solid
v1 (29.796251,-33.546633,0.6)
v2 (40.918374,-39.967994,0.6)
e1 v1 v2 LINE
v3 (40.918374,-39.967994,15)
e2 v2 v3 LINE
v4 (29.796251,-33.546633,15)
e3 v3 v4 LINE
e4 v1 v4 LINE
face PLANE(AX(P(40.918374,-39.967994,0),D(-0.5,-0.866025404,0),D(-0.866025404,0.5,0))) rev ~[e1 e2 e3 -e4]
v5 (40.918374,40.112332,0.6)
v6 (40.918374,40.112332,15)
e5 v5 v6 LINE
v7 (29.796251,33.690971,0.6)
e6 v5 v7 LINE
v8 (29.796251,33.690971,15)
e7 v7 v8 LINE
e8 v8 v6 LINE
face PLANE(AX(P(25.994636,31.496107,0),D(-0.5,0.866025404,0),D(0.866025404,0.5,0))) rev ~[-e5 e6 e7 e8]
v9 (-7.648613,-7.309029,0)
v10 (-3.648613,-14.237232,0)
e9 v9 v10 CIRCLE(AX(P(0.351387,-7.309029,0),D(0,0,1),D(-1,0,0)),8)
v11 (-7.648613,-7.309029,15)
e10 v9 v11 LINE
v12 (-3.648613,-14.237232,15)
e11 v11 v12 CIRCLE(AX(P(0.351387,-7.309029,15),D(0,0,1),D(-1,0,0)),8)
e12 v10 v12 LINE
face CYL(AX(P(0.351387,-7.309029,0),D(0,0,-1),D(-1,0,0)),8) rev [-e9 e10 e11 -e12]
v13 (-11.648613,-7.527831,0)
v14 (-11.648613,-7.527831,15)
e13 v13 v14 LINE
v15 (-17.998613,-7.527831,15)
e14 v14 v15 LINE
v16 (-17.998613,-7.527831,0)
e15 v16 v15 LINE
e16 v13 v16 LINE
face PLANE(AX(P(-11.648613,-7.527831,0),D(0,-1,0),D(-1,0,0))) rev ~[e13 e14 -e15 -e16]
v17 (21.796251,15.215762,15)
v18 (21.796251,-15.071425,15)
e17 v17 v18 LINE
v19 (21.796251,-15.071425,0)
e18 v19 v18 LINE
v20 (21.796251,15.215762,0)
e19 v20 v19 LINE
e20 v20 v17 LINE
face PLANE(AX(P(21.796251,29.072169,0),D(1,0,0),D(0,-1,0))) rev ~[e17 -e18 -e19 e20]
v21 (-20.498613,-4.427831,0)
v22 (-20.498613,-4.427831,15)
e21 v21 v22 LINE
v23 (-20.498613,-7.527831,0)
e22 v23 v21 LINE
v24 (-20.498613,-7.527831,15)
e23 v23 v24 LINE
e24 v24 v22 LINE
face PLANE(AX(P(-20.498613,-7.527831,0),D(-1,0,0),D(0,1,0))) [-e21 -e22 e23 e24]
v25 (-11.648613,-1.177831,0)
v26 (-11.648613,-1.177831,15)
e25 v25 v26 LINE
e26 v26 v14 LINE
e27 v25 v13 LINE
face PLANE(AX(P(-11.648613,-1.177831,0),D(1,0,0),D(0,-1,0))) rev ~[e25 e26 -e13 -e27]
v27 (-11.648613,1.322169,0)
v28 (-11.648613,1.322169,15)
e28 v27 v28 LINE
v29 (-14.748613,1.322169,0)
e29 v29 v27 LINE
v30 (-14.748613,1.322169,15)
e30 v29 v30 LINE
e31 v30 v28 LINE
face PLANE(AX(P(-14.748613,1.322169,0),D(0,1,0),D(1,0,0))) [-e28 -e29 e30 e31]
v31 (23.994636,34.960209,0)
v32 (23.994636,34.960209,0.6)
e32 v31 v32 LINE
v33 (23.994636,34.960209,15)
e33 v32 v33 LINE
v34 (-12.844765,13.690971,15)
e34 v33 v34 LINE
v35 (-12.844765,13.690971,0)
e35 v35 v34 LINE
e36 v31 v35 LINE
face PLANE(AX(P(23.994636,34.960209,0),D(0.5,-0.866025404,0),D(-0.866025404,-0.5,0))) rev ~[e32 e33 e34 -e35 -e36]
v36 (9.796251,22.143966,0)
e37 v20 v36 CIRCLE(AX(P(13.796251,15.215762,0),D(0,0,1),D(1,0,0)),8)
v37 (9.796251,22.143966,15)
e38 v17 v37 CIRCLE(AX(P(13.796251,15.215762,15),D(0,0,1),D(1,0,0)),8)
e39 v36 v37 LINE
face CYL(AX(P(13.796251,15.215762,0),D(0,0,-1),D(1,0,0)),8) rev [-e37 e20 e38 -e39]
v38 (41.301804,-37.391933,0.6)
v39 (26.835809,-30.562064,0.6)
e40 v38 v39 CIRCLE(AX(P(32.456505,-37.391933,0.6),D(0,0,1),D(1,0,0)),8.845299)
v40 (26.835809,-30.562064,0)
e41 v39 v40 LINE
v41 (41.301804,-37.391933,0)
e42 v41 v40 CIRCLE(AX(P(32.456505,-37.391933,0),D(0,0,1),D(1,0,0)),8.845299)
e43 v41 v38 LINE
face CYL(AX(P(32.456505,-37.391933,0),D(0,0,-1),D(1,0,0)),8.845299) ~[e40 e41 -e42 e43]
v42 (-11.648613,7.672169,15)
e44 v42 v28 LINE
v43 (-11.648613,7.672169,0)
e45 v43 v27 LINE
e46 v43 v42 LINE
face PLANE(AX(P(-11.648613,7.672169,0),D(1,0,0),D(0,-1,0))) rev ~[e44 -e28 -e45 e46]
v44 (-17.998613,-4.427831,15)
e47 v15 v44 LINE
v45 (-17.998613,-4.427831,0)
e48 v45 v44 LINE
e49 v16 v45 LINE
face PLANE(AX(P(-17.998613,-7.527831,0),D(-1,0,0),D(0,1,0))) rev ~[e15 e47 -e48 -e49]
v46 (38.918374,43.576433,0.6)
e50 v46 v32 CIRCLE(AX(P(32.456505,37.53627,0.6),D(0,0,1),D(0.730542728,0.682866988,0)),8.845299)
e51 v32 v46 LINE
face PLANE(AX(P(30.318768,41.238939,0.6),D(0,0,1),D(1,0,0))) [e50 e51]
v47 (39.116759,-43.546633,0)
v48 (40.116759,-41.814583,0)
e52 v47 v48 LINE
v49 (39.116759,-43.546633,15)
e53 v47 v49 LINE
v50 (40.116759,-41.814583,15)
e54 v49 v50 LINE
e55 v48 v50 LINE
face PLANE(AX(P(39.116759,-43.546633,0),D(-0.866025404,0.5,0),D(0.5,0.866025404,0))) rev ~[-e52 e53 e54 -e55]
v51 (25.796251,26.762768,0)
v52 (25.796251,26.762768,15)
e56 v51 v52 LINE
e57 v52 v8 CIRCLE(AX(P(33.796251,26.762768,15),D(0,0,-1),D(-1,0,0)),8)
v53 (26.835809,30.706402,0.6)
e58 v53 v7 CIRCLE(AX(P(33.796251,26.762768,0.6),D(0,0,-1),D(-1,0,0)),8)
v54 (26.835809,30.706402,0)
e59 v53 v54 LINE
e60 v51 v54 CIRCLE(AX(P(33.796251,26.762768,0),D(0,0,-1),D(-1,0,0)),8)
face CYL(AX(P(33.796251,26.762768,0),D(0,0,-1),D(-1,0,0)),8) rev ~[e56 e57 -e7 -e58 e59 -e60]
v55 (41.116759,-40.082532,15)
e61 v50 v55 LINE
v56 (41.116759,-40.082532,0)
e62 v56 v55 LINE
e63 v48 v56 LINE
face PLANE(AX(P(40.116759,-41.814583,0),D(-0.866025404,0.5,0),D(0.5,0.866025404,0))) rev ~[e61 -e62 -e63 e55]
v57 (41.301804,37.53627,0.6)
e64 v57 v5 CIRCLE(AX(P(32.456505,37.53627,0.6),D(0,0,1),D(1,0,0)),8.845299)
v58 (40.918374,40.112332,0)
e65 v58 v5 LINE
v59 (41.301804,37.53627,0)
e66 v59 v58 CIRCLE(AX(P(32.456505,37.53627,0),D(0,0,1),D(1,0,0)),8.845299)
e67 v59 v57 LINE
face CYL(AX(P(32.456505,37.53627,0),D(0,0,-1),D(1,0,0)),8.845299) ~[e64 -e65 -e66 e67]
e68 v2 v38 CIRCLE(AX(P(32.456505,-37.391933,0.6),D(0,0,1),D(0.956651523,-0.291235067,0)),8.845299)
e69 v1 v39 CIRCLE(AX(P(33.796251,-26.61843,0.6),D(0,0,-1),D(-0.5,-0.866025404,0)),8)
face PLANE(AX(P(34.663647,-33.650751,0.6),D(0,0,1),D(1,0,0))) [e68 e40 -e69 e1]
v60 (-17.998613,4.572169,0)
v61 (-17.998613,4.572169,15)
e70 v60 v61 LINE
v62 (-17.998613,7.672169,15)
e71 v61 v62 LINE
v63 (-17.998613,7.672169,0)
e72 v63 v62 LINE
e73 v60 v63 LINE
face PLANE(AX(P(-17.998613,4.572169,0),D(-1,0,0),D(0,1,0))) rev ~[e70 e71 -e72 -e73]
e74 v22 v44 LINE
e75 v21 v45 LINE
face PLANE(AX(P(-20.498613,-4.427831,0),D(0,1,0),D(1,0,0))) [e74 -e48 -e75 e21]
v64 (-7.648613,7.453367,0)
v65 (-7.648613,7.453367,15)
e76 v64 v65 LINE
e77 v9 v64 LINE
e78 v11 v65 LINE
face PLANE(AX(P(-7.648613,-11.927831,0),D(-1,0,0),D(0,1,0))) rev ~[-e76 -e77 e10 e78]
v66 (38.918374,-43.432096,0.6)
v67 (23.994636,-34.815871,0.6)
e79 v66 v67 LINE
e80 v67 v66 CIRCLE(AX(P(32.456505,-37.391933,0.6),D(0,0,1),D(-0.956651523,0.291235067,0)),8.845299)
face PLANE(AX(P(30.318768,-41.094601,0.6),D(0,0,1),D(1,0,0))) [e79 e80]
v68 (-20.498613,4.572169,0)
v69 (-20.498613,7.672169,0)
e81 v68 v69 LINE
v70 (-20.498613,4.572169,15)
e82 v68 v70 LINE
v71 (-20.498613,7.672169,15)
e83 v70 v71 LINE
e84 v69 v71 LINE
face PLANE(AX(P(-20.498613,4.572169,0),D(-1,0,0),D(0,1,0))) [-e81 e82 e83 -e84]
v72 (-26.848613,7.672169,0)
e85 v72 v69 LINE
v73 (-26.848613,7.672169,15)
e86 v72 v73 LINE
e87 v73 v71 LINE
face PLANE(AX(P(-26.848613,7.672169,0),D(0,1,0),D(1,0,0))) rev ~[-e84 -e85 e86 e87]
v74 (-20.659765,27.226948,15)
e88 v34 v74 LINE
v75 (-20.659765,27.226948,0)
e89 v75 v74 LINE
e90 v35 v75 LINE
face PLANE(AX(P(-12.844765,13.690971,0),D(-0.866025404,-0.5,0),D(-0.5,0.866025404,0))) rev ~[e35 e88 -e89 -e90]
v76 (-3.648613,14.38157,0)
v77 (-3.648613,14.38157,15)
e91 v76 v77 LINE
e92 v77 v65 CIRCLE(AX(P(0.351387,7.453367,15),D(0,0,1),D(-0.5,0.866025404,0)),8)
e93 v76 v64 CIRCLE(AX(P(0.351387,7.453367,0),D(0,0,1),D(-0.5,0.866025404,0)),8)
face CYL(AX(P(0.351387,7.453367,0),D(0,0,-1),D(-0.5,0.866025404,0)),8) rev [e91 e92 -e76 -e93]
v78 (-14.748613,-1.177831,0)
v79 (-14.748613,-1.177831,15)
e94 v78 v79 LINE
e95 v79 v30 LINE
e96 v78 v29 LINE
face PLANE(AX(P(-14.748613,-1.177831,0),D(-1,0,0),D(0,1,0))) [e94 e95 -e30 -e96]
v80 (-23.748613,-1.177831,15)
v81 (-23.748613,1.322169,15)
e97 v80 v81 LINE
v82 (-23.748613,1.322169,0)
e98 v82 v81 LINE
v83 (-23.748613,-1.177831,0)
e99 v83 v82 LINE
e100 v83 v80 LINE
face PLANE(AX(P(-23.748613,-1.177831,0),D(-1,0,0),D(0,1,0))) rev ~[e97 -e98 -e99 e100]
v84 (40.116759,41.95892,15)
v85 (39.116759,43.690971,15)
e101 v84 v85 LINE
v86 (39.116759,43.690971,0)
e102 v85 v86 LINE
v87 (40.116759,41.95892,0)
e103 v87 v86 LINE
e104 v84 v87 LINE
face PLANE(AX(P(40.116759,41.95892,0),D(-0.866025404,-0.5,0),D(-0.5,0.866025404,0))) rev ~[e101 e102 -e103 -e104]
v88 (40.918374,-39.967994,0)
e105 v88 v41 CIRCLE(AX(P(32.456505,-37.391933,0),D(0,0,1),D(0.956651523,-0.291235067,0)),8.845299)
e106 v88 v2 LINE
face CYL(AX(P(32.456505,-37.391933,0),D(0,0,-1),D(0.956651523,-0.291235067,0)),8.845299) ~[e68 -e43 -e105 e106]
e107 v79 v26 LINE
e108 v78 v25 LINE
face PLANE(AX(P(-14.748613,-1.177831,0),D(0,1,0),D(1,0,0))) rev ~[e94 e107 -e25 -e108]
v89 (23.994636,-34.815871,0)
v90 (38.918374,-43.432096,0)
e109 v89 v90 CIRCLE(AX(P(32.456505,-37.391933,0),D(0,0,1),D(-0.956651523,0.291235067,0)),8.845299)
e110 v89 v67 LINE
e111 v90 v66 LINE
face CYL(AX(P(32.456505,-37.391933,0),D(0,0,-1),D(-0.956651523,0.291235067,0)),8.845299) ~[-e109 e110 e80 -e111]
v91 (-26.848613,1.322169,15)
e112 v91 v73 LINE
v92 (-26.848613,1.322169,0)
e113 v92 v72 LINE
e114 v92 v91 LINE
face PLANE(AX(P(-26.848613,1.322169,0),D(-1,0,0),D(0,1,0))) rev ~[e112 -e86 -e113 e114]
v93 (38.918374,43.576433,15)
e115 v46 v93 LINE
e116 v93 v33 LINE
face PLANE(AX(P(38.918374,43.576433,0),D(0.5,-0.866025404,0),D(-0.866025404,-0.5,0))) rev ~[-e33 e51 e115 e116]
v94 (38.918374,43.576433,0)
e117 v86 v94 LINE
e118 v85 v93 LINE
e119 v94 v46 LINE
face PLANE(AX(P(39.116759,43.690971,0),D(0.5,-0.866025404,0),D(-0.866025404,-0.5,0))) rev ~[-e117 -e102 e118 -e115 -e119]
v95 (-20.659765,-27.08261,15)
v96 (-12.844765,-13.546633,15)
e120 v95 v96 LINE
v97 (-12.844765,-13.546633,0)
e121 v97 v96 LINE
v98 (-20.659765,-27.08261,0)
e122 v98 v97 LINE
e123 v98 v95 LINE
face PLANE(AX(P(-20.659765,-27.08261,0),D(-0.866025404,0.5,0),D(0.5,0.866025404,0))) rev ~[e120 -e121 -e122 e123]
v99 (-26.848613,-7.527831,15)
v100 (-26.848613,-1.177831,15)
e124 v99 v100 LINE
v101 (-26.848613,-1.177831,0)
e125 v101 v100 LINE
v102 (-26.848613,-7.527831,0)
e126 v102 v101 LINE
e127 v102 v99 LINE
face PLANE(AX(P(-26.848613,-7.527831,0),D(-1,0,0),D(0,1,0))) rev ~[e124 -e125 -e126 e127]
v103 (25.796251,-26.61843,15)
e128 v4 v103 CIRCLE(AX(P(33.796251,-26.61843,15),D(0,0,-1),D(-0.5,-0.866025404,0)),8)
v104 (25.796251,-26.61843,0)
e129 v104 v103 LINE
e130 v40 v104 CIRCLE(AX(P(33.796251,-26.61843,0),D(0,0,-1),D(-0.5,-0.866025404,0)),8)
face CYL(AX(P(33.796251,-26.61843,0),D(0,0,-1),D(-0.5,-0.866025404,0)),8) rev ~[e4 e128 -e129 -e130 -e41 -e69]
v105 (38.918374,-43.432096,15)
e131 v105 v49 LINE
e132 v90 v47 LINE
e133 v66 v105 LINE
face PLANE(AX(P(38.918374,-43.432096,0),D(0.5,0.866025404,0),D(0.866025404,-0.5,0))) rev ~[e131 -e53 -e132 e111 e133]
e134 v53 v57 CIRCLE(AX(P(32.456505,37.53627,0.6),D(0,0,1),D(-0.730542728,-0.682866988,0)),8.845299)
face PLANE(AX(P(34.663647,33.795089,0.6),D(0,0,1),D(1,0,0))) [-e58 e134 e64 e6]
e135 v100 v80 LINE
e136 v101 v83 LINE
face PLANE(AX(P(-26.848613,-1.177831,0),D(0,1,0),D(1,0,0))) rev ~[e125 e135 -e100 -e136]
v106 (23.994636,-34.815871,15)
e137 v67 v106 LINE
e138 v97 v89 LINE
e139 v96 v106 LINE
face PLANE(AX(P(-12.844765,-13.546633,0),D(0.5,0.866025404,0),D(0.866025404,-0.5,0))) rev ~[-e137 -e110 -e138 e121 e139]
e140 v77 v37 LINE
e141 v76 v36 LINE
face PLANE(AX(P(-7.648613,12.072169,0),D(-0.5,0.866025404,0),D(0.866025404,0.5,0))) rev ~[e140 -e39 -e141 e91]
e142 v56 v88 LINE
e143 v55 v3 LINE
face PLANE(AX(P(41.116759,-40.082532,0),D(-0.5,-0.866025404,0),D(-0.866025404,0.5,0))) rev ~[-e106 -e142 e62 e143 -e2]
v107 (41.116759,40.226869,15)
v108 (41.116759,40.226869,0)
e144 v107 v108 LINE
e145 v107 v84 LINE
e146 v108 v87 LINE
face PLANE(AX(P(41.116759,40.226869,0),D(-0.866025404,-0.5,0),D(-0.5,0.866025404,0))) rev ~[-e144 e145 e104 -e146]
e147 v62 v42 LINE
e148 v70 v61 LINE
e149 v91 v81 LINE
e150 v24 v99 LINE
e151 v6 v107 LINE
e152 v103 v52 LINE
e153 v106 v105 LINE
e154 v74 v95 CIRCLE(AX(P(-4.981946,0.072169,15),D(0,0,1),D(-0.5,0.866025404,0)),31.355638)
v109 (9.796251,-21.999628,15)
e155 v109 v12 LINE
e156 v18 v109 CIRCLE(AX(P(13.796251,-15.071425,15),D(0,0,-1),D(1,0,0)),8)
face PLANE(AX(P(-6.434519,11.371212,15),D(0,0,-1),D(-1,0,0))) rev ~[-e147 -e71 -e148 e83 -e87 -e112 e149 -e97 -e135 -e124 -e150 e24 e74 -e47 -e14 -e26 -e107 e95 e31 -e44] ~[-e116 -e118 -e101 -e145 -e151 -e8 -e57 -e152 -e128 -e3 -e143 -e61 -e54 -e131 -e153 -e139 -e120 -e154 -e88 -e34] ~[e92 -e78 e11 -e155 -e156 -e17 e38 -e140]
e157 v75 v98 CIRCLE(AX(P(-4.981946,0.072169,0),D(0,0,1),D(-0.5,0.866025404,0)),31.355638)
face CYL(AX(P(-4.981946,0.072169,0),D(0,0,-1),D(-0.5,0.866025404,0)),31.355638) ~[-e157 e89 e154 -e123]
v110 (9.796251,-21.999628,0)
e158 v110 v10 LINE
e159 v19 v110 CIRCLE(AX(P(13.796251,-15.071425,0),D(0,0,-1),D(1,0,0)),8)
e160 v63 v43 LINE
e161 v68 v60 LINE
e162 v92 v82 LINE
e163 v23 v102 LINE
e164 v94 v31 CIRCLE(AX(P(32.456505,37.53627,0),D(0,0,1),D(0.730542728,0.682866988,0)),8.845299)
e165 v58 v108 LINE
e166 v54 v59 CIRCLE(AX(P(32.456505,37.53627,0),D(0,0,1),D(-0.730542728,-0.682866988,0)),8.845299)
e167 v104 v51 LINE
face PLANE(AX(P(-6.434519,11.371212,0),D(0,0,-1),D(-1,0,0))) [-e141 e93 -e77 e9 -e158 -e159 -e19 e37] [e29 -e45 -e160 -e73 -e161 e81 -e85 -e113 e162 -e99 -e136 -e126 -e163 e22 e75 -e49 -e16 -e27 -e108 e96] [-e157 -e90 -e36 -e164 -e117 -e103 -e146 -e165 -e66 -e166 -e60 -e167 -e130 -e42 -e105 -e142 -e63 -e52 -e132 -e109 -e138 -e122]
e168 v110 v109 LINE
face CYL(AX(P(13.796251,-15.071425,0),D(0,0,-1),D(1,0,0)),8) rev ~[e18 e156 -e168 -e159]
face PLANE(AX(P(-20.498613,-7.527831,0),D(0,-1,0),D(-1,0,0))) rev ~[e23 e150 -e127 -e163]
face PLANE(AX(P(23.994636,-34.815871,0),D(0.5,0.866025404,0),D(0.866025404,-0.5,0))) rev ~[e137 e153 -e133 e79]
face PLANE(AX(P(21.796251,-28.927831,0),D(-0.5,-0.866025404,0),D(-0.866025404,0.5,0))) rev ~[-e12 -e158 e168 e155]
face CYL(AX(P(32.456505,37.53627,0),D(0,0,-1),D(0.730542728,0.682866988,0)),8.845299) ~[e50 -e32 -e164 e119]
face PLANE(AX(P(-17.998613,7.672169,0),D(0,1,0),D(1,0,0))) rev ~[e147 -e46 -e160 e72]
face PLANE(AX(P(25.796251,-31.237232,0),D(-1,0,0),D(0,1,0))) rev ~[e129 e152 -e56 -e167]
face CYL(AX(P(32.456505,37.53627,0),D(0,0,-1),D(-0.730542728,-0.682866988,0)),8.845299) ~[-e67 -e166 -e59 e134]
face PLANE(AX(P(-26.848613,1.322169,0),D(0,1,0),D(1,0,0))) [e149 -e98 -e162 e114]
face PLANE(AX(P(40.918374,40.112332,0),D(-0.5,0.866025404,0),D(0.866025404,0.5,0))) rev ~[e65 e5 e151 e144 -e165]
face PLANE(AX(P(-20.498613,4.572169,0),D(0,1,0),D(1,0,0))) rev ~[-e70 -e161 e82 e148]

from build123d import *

# Parameters (mm, degrees)
F0_W        = 2.5
F0_H        = 3.1
F0_W_2      = 3.1
F0_H_2      = 2.5
F1_DEPTH    = 15
F2_DEPTH    = 0.6
F3_T1_DEPTH = 15


# Not quite as in the source:
# - a fillet or chamfer that OpenCascade refuses, or shapes differently, is made with other operations: its cross-section is extruded or revolved along the edge and cut away or added


with BuildPart() as f1:
    # F0 (on Top) → F1 (new body)
    with BuildSketch(Plane.XY):
        with BuildLine():
            Line((39.1167589883, 43.6909709372), (38.9183741482, 43.5764333963))
            ThreePointArc((38.9183741482, 43.5764333963), (39.563732113, 42.8018800146), (40.1167589265, 41.9589202367))
            Line((40.1167589265, 41.9589202367), (39.1167589883, 43.6909709372))
        make_face()
        with BuildLine():
            ThreePointArc((40.1167589265, -41.8145826694), (39.563732113, -42.6575424473), (38.9183741482, -43.432095829))
            Line((38.9183741482, -43.432095829), (39.1167589883, -43.5466333699))
            Line((39.1167589883, -43.5466333699), (40.1167589265, -41.8145826694))
        make_face()
        with BuildLine():
            Line((41.1167589883, 40.226869322), (40.1167589265, 41.9589202367))
            ThreePointArc((40.1167589265, 41.9589202367), (40.5702701762, 41.0585049774), (40.9183741482, 40.1123317812))
            Line((40.9183741482, 40.1123317812), (41.1167589883, 40.226869322))
        make_face()
        with BuildLine():
            Line((41.1167589883, -40.0825317547), (40.9183741482, -39.9679942139))
            ThreePointArc((40.9183741482, -39.9679942139), (40.5702701762, -40.9141674102), (40.1167589265, -41.8145826694))
            Line((40.1167589265, -41.8145826694), (41.1167589883, -40.0825317547))
        make_face()
        with BuildLine():
            Line((38.9183741482, 43.5764333963), (23.9946357527, 34.9602090164))
            ThreePointArc((23.9946357527, 34.9602090164), (24.7962509126, 33.113620668), (25.9946357527, 31.4961074012))
            Line((25.9946357527, 31.4961074012), (40.9183741482, 40.1123317812))
            ThreePointArc((40.9183741482, 40.1123317812), (40.5702701762, 41.0585049774), (40.1167589265, 41.9589202367))
            ThreePointArc((40.1167589265, 41.9589202367), (39.563732113, 42.8018800146), (38.9183741482, 43.5764333963))
        make_face()
        with BuildLine():
            ThreePointArc((25.9946357527, -31.3517698339), (24.7962509126, -32.9692831007), (23.9946357527, -34.8158714491))
            Line((23.9946357527, -34.8158714491), (38.9183741482, -43.432095829))
            ThreePointArc((38.9183741482, -43.432095829), (39.563732113, -42.6575424473), (40.1167589265, -41.8145826694))
            ThreePointArc((40.1167589265, -41.8145826694), (40.5702701762, -40.9141674102), (40.9183741482, -39.9679942139))
            Line((40.9183741482, -39.9679942139), (25.9946357527, -31.3517698339))
        make_face()
        with BuildLine():
            Line((23.9946357527, 34.9602090164), (-12.8447652387, 13.6909709372))
            Line((-12.8447652387, 13.6909709372), (-20.6597652387, 27.2269479983))
            ThreePointArc((-20.6597652387, 27.2269479983), (-36.3375843281, 0.0721687836), (-20.6597652387, -27.082610431))
            Line((-20.6597652387, -27.082610431), (-12.8447652387, -13.5466333699))
            Line((-12.8447652387, -13.5466333699), (23.9946357527, -34.8158714491))
            ThreePointArc((23.9946357527, -34.8158714491), (24.7962509126, -32.9692831007), (25.9946357527, -31.3517698339))
            Line((25.9946357527, -31.3517698339), (25.7962509126, -31.2372322931))
            Line((25.7962509126, -31.2372322931), (25.7962509126, 31.3815698604))
            Line((25.7962509126, 31.3815698604), (25.9946357527, 31.4961074012))
            ThreePointArc((25.9946357527, 31.4961074012), (24.7962509126, 33.113620668), (23.9946357527, 34.9602090164))
        make_face()
        Polygon((-7.648612816, -11.9278312164), (-7.648612816, 12.0721687836), (21.7962509126, 29.0721687836), (21.7962509126, -28.9278312164), align=None, mode=Mode.SUBTRACT)
        Polygon((-17.998612816, 7.6721687836), (-11.648612816, 7.6721687836), (-11.648612816, 1.3221687836), (-11.648612816, -1.1778312164), (-11.648612816, -7.5278312164), (-17.998612816, -7.5278312164), (-20.498612816, -7.5278312164), (-26.848612816, -7.5278312164), (-26.848612816, -1.1778312164), (-26.848612816, 1.3221687836), (-26.848612816, 7.6721687836), (-20.498612816, 7.6721687836), align=None, mode=Mode.SUBTRACT)
        with Locations((-19.248612816, -5.9778312164)):
            Rectangle(F0_W, F0_H)
        with Locations((-13.198612816, 0.0721687836)):
            Rectangle(F0_W_2, F0_H_2)
        with Locations((-19.248612816, 6.1221687836)):
            Rectangle(F0_W, F0_H)
        with Locations((-25.298612816, 0.0721687836)):
            Rectangle(F0_W_2, F0_H_2)
    extrude(amount=F1_DEPTH)

    # F0 (on Top) → F2 (join)
    with BuildSketch(Plane.XY):
        with BuildLine():
            ThreePointArc((38.9183741482, 43.5764333963), (28.0338552197, 45.1965244366), (23.9946357527, 34.9602090164))
            Line((23.9946357527, 34.9602090164), (38.9183741482, 43.5764333963))
        make_face()
        with BuildLine():
            Line((39.1167589883, 43.6909709372), (38.9183741482, 43.5764333963))
            ThreePointArc((38.9183741482, 43.5764333963), (39.563732113, 42.8018800146), (40.1167589265, 41.9589202367))
            Line((40.1167589265, 41.9589202367), (39.1167589883, 43.6909709372))
        make_face()
        with BuildLine():
            Line((38.9183741482, -43.432095829), (23.9946357527, -34.8158714491))
            ThreePointArc((23.9946357527, -34.8158714491), (28.0338552197, -45.0521868693), (38.9183741482, -43.432095829))
        make_face()
        with BuildLine():
            ThreePointArc((40.1167589265, -41.8145826694), (39.563732113, -42.6575424473), (38.9183741482, -43.432095829))
            Line((38.9183741482, -43.432095829), (39.1167589883, -43.5466333699))
            Line((39.1167589883, -43.5466333699), (40.1167589265, -41.8145826694))
        make_face()
        with BuildLine():
            Line((41.1167589883, 40.226869322), (40.1167589265, 41.9589202367))
            ThreePointArc((40.1167589265, 41.9589202367), (40.5702701762, 41.0585049774), (40.9183741482, 40.1123317812))
            Line((40.9183741482, 40.1123317812), (41.1167589883, 40.226869322))
        make_face()
        with BuildLine():
            Line((40.9183741482, 40.1123317812), (25.9946357527, 31.4961074012))
            ThreePointArc((25.9946357527, 31.4961074012), (35.7032074646, 29.3083760539), (41.3018044121, 37.5362703988))
            ThreePointArc((41.3018044121, 37.5362703988), (41.2054217299, 38.8384907155), (40.9183741482, 40.1123317812))
        make_face()
        with BuildLine():
            ThreePointArc((41.3018044121, -37.3919328315), (35.7032074646, -29.1640384866), (25.9946357527, -31.3517698339))
            Line((25.9946357527, -31.3517698339), (40.9183741482, -39.9679942139))
            ThreePointArc((40.9183741482, -39.9679942139), (41.2054217299, -38.6941531482), (41.3018044121, -37.3919328315))
        make_face()
        with BuildLine():
            Line((41.1167589883, -40.0825317547), (40.9183741482, -39.9679942139))
            ThreePointArc((40.9183741482, -39.9679942139), (40.5702701762, -40.9141674102), (40.1167589265, -41.8145826694))
            Line((40.1167589265, -41.8145826694), (41.1167589883, -40.0825317547))
        make_face()
    extrude(amount=F2_DEPTH)

    # F3: fillet of radius 8 on 6 edges, made by hand

    # F3_s2 → F3_t1 (join)
    with BuildSketch(Plane.XY):
        with BuildLine():
            ThreePointArc((-3.648612816, 14.3815698604), (-6.5768160463, 11.4533666301), (-7.648612816, 7.4533666301))
            Line((-7.648612816, 7.4533666301), (-7.648612816, 12.0721687836))
            Line((-7.648612816, 12.0721687836), (-3.648612816, 14.3815698604))
        make_face()
        with BuildLine():
            ThreePointArc((25.7962509126, 26.7627677069), (26.8680476824, 30.7627677069), (29.7962509126, 33.6909709372))
            Line((29.7962509126, 33.6909709372), (25.7962509126, 31.3815698604))
            Line((25.7962509126, 31.3815698604), (25.7962509126, 26.7627677069))
        make_face()
        with BuildLine():
            ThreePointArc((21.7962509126, 15.2157623231), (17.7962509126, 22.1439655534), (9.7962509126, 22.1439655534))
            Line((9.7962509126, 22.1439655534), (21.7962509126, 29.0721687836))
            Line((21.7962509126, 29.0721687836), (21.7962509126, 15.2157623231))
        make_face()
        with BuildLine():
            ThreePointArc((21.7962509126, -15.0714247558), (17.7962509126, -21.9996279861), (9.7962509126, -21.9996279861))
            Line((9.7962509126, -21.9996279861), (21.7962509126, -28.9278312164))
            Line((21.7962509126, -28.9278312164), (21.7962509126, -15.0714247558))
        make_face()
        with BuildLine():
            ThreePointArc((29.7962509126, -33.5466333699), (26.8680476824, -30.6184301396), (25.7962509126, -26.6184301396))
            Line((25.7962509126, -26.6184301396), (25.7962509126, -31.2372322931))
            Line((25.7962509126, -31.2372322931), (29.7962509126, -33.5466333699))
        make_face()
        with BuildLine():
            ThreePointArc((-7.648612816, -7.3090290628), (-6.5768160463, -11.3090290628), (-3.648612816, -14.2372322931))
            Line((-3.648612816, -14.2372322931), (-7.648612816, -11.9278312164))
            Line((-7.648612816, -11.9278312164), (-7.648612816, -7.3090290628))
        make_face()
    extrude(amount=F3_T1_DEPTH)


solid = f1.part
